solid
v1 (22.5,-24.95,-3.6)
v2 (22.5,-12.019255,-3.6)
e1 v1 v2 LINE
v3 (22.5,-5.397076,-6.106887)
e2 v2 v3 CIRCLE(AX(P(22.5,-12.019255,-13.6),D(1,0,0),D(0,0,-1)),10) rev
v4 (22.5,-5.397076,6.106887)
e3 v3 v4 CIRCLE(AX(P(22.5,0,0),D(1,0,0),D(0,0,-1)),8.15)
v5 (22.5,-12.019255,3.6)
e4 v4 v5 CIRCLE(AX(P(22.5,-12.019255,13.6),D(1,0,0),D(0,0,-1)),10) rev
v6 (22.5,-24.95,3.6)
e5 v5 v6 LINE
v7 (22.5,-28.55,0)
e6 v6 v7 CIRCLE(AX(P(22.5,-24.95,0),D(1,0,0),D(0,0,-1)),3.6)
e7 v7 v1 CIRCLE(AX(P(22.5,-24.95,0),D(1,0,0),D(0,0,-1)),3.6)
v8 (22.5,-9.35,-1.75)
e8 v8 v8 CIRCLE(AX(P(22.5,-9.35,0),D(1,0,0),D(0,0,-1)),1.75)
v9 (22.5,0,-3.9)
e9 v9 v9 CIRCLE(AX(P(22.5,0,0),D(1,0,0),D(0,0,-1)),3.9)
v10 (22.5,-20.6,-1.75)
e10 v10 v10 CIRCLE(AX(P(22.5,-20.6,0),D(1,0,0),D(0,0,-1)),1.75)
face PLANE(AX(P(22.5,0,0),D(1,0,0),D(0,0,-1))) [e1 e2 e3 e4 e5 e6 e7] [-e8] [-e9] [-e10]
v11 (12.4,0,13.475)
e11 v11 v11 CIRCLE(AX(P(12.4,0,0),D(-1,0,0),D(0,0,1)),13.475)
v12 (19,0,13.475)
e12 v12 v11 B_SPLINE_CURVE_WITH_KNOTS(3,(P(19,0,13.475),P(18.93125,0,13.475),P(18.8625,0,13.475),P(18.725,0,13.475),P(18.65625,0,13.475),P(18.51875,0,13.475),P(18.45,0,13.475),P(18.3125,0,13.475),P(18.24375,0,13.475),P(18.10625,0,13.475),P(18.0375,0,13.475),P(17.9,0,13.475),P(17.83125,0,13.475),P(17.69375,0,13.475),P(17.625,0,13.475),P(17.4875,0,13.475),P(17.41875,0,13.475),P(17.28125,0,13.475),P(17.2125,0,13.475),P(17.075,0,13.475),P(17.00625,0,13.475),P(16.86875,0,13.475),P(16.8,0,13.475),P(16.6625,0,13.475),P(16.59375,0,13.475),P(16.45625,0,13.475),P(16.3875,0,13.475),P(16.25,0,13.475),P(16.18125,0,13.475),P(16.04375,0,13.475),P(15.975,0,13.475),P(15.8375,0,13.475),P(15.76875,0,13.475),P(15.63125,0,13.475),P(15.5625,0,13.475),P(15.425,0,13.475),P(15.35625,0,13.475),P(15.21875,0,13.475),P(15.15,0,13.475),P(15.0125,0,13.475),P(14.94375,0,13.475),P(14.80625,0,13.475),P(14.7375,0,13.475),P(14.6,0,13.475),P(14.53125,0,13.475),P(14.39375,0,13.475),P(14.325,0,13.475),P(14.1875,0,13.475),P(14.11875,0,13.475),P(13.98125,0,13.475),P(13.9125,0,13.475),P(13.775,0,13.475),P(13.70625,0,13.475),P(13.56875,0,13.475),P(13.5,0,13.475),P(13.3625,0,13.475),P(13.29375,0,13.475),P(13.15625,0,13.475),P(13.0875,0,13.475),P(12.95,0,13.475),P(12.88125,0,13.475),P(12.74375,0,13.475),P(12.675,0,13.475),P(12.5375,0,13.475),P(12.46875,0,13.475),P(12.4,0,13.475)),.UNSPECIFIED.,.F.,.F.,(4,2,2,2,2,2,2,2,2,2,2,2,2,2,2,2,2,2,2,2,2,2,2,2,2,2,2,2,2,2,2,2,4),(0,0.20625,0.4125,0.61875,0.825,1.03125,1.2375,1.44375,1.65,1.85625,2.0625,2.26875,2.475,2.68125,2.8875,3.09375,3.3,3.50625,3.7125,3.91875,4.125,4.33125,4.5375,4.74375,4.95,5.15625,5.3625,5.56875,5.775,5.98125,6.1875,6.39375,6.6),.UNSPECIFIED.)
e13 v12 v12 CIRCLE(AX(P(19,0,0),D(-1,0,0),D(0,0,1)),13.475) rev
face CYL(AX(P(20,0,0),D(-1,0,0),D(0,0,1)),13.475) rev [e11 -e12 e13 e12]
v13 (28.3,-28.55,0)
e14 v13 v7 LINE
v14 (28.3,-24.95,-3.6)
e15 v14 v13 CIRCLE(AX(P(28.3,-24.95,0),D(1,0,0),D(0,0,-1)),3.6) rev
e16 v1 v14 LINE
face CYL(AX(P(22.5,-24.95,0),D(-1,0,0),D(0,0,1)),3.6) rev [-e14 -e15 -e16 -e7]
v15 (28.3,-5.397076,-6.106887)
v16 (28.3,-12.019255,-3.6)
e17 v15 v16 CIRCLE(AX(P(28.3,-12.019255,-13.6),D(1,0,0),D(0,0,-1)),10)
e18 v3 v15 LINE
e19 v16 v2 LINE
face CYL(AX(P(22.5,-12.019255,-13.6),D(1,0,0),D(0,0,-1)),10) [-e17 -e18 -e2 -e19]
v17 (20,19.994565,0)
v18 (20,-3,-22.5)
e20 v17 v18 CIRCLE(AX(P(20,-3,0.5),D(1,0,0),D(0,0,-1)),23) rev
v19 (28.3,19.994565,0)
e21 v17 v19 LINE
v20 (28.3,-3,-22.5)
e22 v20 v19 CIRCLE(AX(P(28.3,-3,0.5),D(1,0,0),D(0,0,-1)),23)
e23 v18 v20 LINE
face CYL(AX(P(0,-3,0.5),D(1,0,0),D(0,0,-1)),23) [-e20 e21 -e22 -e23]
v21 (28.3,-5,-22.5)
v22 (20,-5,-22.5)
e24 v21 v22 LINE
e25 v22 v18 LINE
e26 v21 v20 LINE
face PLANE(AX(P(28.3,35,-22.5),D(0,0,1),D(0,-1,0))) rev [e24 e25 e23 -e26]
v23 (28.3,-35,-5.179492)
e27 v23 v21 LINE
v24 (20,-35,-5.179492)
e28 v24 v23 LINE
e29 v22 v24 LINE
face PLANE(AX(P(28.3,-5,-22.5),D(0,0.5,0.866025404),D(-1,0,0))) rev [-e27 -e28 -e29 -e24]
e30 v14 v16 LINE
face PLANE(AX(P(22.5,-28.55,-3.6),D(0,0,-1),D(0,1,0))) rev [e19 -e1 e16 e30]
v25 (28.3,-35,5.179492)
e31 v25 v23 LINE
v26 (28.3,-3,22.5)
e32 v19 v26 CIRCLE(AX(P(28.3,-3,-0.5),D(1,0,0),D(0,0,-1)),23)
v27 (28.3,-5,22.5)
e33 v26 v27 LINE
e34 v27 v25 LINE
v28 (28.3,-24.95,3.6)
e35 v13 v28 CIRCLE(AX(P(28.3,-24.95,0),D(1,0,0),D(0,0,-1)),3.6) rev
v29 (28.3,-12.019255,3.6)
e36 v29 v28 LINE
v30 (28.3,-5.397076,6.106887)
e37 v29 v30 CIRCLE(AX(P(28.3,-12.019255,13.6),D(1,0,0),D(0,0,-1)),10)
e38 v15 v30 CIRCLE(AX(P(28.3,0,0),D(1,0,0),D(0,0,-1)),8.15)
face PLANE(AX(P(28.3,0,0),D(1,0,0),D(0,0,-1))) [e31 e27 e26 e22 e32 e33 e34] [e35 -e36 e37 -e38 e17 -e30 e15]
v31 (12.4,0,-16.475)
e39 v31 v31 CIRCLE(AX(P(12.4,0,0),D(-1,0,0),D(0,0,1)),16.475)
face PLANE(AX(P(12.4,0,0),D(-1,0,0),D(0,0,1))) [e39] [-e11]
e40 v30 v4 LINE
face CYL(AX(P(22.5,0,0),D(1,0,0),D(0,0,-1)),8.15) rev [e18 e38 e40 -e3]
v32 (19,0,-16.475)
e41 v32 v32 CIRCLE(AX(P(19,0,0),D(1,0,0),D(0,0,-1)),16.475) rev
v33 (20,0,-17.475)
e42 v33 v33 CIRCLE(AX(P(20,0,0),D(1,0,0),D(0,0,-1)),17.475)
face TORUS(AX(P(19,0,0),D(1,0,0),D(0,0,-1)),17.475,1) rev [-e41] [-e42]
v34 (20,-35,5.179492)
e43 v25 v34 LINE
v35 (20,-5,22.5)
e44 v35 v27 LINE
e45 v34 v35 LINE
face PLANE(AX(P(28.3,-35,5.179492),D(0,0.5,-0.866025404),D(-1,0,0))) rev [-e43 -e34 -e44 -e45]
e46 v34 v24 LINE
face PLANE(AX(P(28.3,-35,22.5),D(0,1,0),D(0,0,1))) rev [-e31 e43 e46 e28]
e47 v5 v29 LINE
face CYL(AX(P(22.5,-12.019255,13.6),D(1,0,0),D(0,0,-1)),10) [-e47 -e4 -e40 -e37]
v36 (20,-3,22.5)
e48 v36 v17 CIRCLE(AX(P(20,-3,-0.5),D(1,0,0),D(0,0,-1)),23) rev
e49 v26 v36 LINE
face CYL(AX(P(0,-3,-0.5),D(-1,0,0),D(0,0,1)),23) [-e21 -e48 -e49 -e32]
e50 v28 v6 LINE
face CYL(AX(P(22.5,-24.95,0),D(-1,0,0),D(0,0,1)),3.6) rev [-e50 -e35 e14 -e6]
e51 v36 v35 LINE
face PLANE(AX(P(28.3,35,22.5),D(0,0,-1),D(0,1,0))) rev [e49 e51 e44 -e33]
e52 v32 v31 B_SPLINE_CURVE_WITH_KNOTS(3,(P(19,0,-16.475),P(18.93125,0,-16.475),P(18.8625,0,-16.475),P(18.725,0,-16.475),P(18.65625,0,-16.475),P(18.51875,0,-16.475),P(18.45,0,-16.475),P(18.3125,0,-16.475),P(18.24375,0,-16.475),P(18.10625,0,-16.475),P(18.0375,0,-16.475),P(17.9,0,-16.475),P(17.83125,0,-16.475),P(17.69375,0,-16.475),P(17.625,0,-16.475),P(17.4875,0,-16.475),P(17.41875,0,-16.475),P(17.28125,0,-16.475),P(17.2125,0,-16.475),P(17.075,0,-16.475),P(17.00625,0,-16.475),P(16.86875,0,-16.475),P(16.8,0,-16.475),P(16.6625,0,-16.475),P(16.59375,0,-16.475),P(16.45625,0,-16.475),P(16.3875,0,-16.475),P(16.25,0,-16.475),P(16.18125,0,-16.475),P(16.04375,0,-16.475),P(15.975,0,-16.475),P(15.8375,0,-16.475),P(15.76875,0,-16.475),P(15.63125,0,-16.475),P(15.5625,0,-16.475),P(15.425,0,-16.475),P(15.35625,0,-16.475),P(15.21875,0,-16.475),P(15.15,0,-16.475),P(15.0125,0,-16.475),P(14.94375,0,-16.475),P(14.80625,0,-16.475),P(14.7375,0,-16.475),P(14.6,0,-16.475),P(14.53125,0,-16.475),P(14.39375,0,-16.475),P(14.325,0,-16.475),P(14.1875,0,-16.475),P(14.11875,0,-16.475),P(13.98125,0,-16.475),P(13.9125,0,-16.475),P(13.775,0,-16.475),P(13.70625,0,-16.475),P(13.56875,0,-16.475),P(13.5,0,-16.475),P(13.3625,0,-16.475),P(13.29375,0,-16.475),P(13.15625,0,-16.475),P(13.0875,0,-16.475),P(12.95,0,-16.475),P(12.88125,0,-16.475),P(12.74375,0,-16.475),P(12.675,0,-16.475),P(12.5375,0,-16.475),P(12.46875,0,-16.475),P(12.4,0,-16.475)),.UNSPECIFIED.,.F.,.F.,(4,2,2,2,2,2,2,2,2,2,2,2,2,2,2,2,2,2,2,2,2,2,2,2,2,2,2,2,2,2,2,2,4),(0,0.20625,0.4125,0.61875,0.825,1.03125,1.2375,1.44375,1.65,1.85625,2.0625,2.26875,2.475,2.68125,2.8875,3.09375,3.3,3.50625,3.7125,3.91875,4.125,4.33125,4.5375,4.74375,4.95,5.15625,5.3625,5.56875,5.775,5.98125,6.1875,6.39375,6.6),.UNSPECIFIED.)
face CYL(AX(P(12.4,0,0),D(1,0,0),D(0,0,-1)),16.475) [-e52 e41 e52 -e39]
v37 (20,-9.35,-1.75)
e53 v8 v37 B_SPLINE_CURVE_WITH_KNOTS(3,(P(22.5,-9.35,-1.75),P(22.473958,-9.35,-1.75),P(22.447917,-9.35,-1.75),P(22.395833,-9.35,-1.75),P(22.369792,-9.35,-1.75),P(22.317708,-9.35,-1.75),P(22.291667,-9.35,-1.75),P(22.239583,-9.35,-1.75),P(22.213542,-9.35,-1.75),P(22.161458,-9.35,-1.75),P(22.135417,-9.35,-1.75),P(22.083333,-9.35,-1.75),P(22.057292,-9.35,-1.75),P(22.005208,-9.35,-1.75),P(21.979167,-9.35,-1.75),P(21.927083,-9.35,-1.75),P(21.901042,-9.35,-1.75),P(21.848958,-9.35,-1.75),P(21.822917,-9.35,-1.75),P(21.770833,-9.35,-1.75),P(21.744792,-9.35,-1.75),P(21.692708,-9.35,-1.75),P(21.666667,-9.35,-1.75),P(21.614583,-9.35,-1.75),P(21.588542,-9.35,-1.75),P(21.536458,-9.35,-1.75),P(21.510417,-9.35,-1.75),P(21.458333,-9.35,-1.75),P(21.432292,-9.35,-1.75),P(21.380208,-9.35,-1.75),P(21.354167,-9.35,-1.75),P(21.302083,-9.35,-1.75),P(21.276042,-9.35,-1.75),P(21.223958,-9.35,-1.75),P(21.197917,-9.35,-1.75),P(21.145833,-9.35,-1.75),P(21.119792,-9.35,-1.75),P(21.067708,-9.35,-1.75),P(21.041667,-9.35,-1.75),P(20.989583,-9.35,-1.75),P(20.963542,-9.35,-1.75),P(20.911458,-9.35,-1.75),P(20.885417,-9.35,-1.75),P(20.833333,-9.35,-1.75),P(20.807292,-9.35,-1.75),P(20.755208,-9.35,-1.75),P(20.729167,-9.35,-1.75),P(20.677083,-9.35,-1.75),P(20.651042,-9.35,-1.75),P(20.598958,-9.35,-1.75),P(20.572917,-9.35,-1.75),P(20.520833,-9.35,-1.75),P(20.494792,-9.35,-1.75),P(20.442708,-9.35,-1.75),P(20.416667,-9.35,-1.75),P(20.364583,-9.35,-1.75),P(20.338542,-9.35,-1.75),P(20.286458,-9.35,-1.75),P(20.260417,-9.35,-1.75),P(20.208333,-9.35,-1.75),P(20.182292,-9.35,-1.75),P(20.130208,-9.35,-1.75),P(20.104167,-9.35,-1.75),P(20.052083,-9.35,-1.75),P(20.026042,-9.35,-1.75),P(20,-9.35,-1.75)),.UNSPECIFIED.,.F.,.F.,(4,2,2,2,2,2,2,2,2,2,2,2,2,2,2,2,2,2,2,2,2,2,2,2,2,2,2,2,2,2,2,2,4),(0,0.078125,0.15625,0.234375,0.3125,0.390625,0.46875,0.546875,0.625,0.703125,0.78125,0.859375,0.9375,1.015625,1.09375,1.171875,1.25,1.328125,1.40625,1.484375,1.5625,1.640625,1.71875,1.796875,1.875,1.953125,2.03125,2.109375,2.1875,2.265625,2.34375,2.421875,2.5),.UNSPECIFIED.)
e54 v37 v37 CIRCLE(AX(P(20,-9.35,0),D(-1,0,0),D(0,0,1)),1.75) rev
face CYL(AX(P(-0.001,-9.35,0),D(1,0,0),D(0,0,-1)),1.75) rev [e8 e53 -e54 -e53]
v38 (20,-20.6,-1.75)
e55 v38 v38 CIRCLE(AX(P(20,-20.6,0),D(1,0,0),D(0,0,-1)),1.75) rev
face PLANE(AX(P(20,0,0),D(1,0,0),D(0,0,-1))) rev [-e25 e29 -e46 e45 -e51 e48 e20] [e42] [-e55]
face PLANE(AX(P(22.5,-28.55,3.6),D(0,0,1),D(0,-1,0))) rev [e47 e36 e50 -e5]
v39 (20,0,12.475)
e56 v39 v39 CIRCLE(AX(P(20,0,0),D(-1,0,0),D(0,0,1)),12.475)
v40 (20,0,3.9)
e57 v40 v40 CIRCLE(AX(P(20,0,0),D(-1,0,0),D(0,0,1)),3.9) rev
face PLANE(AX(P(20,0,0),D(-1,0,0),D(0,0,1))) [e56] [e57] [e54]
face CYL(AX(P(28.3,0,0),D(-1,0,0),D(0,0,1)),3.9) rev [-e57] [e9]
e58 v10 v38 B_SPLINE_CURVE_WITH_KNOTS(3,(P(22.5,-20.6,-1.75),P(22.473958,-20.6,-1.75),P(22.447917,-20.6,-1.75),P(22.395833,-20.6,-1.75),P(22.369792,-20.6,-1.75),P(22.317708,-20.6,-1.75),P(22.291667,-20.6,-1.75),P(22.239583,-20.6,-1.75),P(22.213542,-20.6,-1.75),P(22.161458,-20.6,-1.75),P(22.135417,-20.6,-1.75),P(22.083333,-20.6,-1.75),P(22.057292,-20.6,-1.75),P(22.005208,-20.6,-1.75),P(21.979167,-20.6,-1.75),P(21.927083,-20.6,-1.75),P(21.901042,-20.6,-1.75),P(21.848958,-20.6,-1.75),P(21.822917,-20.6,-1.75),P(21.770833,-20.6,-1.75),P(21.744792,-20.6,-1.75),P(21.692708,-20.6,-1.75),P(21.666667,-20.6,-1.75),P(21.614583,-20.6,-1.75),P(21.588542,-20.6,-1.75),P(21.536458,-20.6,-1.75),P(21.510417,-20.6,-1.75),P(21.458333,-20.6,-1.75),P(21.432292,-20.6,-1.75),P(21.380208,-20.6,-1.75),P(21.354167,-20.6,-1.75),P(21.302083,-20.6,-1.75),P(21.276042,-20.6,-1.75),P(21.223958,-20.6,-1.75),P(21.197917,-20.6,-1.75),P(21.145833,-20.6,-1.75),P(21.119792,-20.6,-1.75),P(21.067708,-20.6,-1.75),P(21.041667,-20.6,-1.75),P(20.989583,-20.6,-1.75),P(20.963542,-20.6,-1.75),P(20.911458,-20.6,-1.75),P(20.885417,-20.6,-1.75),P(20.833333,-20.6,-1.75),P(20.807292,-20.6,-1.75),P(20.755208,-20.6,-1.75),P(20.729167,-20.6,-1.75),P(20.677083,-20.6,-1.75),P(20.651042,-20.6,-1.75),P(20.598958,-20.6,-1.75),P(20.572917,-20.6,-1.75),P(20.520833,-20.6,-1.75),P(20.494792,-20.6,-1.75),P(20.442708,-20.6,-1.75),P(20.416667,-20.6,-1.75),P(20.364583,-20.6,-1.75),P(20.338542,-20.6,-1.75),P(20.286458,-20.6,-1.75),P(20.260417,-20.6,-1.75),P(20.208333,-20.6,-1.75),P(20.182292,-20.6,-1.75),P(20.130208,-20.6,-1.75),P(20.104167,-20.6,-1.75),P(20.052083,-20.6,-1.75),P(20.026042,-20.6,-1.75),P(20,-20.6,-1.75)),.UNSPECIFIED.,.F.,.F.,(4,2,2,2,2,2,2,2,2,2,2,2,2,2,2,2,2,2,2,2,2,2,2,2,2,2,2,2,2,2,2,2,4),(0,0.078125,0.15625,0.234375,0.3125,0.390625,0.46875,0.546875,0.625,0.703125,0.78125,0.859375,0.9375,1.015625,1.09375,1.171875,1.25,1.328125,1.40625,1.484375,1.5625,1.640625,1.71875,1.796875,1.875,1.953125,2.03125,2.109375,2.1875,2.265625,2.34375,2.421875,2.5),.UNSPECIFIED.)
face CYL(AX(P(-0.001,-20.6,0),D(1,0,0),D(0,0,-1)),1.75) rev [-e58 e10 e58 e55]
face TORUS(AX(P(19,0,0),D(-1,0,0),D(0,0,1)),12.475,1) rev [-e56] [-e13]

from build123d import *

# Parameters (mm, degrees)
SKETCH1_W           = 20
SKETCH1_H           = 20
BOSS_EXTRUDE1_DEPTH = 20
SKETCH2_W           = 45
SKETCH2_H           = 70
BOSS_EXTRUDE2_DEPTH = 8.3
CUT_EXTRUDE1_DEPTH  = 5.8
FILLET1_R           = 3.6
FILLET2_R           = 10
SKETCH5_R           = 3.9
CUT_EXTRUDE2_DEPTH  = 51.320373608
CUT_EXTRUDE3_REACH  = 49.302
SKETCH6_R           = 1.75
SKETCH13_W          = 20
SKETCH13_H          = 20
CUT_EXTRUDE9_DEPTH  = 20
SKETCH14_R          = 16.475
BOSS_EXTRUDE3_DEPTH = 7.6
SKETCH15_W          = 8.3
SKETCH15_H          = 45
CUT_EXTRUDE10_DEPTH = 15
FILLET3_R           = 23
CHAMFER1_SIZE       = 30
CHAMFER1_SIZE2      = 17.320508076
CHAMFER2_SIZE       = 30
CHAMFER2_SIZE2      = 17.320508076
SKETCH16_R          = 13.475
CUT_EXTRUDE11_DEPTH = 7.6
FILLET4_R           = 1


# Some blends are built 0.0001 mm under size
with BuildPart() as part:
    # Sketch1 → Boss-Extrude1 (new body)
    with BuildSketch(Plane(origin=(0, 0, 0), x_dir=(0, 0, -1), z_dir=(1, 0, 0))):
        Rectangle(SKETCH1_W, SKETCH1_H)
    extrude(amount=BOSS_EXTRUDE1_DEPTH)

    # Sketch2 → Boss-Extrude2 (add)
    with BuildSketch(Plane(origin=(20, 0, 0), x_dir=(0, 0, -1), z_dir=(1, 0, 0))):
        Rectangle(SKETCH2_W, SKETCH2_H)
    extrude(amount=BOSS_EXTRUDE2_DEPTH)

    # Sketch4 → Cut-Extrude1 (cut)
    with BuildSketch(Plane(origin=(28.3, 0, 0), x_dir=(0, 0, -1), z_dir=(1, 0, 0))):
        with BuildLine():
            Line((3.6, -28.55), (-3.6, -28.55))
            Line((-3.6, -28.55), (-3.6, -7.311805523))
            ThreePointArc((-3.6, -7.311805523), (0, 8.15), (3.6, -7.311805523))
            Line((3.6, -7.311805523), (3.6, -28.55))
        make_face()
    extrude(amount=-CUT_EXTRUDE1_DEPTH, mode=Mode.SUBTRACT)

    # Fillet1
    fillet1_edges = [part.edges().sort_by_distance(p)[0] for p in [
        (25.4, -28.55, 3.6),
        (25.4, -28.55, -3.6),
    ]]
    fillet(fillet1_edges, radius=FILLET1_R - 0.0001)  # a hair under: the kernel refuses the full size

    # Fillet2
    fillet2_edges = [part.edges().sort_by_distance(p)[0] for p in [
        (25.4, -7.311805523, 3.6),
        (25.4, -7.311805523, -3.6),
    ]]
    fillet(fillet2_edges, radius=FILLET2_R)

    # Sketch5 → Cut-Extrude2 (cut, through all)
    with BuildSketch(Plane.ZY):
        Circle(SKETCH5_R)
    extrude(amount=-CUT_EXTRUDE2_DEPTH, mode=Mode.SUBTRACT)

    # Sketch6 → Cut-Extrude3 (cut, up to next)
    with BuildSketch(Plane(origin=(22.5, 0, 0), x_dir=(0, 0, -1), z_dir=(1, 0, 0)), mode=Mode.PRIVATE) as cut_extrude3_sk1:
        with Locations((0, -20.6)):
            Circle(SKETCH6_R)
    cut_extrude3_tool1 = extrude(cut_extrude3_sk1.sketch, amount=-CUT_EXTRUDE3_REACH, mode=Mode.PRIVATE) & part.part
    # Sketch6 → Cut-Extrude3 (cut, up to next)
    with BuildSketch(Plane(origin=(22.5, 0, 0), x_dir=(0, 0, -1), z_dir=(1, 0, 0)), mode=Mode.PRIVATE) as cut_extrude3_sk2:
        with Locations((0, -9.35)):
            Circle(SKETCH6_R)
    cut_extrude3_tool2 = extrude(cut_extrude3_sk2.sketch, amount=-CUT_EXTRUDE3_REACH, mode=Mode.PRIVATE) & part.part
    add(cut_extrude3_tool1.solids().sort_by_distance((22.5, -20.6, 0))[0], mode=Mode.SUBTRACT)
    add(cut_extrude3_tool2.solids().sort_by_distance((22.5, -9.35, 0))[0], mode=Mode.SUBTRACT)

    # Sketch13 → Cut-Extrude9 (cut)
    with BuildSketch(Plane.ZY):
        Rectangle(SKETCH13_W, SKETCH13_H)
    extrude(amount=-CUT_EXTRUDE9_DEPTH, mode=Mode.SUBTRACT)

    # Sketch14 → Boss-Extrude3 (add)
    with BuildSketch(Plane.ZY.offset(-20)):
        with Locations(Location((0, 0, 0), (0, 0, 180))):
            Circle(SKETCH14_R)
    extrude(amount=BOSS_EXTRUDE3_DEPTH)

    # Sketch15 → Cut-Extrude10 (cut)
    with BuildSketch(Plane(origin=(0, 35, 0), x_dir=(1, 0, 0), z_dir=(0, 1, 0))):
        with Locations((24.15, 0)):
            Rectangle(SKETCH15_W, SKETCH15_H)
    extrude(amount=-CUT_EXTRUDE10_DEPTH, mode=Mode.SUBTRACT)

    # Fillet3
    # the kernel refuses this fillet: 23 mm, written as the material it takes off along each edge
    with BuildSketch(Plane(origin=(-37.5, 20, -22.5), x_dir=(0, -1, 0), z_dir=(1, 0, 0)), Plane(origin=(85.8, 20, 22.5), x_dir=(0, -1, 0), z_dir=(-1, 0, 0))) as fillet3_piece_1:
        with BuildLine():
            CenterArc((FILLET3_R, -FILLET3_R), FILLET3_R, 90, 90)
            Line((0, -FILLET3_R), (0, 0))
            Line((0, 0), (FILLET3_R, 0))
        make_face()
    extrude(amount=123.3, mode=Mode.SUBTRACT)

    # Chamfer1
    chamfer1_edges = [part.edges().sort_by_distance(p)[0] for p in [
        (24.15, -35, 22.5),
    ]]
    chamfer1_side = [part.faces().sort_by_distance(p)[0] for p in [
        (24.15, -19, 22.5),
    ]]
    chamfer(chamfer1_edges, length=CHAMFER1_SIZE, length2=CHAMFER1_SIZE2, reference=chamfer1_side[0])

    # Chamfer2
    chamfer2_edges = [part.edges().sort_by_distance(p)[0] for p in [
        (24.15, -35, -22.5),
    ]]
    chamfer2_side = [part.faces().sort_by_distance(p)[0] for p in [
        (24.15, -19, -22.5),
    ]]
    chamfer(chamfer2_edges, length=CHAMFER2_SIZE, length2=CHAMFER2_SIZE2, reference=chamfer2_side[0])

    # Sketch16 → Cut-Extrude11 (cut)
    with BuildSketch(Plane.ZY.offset(-12.4)):
        Circle(SKETCH16_R)
    extrude(amount=-CUT_EXTRUDE11_DEPTH, mode=Mode.SUBTRACT)

    # Fillet4
    fillet4_edges = [part.edges().sort_by_distance(p)[0] for p in [
        (20, 0, 16.475),
        (20, 0, -13.475),
    ]]
    fillet(fillet4_edges, radius=FILLET4_R)


solid = part.part
